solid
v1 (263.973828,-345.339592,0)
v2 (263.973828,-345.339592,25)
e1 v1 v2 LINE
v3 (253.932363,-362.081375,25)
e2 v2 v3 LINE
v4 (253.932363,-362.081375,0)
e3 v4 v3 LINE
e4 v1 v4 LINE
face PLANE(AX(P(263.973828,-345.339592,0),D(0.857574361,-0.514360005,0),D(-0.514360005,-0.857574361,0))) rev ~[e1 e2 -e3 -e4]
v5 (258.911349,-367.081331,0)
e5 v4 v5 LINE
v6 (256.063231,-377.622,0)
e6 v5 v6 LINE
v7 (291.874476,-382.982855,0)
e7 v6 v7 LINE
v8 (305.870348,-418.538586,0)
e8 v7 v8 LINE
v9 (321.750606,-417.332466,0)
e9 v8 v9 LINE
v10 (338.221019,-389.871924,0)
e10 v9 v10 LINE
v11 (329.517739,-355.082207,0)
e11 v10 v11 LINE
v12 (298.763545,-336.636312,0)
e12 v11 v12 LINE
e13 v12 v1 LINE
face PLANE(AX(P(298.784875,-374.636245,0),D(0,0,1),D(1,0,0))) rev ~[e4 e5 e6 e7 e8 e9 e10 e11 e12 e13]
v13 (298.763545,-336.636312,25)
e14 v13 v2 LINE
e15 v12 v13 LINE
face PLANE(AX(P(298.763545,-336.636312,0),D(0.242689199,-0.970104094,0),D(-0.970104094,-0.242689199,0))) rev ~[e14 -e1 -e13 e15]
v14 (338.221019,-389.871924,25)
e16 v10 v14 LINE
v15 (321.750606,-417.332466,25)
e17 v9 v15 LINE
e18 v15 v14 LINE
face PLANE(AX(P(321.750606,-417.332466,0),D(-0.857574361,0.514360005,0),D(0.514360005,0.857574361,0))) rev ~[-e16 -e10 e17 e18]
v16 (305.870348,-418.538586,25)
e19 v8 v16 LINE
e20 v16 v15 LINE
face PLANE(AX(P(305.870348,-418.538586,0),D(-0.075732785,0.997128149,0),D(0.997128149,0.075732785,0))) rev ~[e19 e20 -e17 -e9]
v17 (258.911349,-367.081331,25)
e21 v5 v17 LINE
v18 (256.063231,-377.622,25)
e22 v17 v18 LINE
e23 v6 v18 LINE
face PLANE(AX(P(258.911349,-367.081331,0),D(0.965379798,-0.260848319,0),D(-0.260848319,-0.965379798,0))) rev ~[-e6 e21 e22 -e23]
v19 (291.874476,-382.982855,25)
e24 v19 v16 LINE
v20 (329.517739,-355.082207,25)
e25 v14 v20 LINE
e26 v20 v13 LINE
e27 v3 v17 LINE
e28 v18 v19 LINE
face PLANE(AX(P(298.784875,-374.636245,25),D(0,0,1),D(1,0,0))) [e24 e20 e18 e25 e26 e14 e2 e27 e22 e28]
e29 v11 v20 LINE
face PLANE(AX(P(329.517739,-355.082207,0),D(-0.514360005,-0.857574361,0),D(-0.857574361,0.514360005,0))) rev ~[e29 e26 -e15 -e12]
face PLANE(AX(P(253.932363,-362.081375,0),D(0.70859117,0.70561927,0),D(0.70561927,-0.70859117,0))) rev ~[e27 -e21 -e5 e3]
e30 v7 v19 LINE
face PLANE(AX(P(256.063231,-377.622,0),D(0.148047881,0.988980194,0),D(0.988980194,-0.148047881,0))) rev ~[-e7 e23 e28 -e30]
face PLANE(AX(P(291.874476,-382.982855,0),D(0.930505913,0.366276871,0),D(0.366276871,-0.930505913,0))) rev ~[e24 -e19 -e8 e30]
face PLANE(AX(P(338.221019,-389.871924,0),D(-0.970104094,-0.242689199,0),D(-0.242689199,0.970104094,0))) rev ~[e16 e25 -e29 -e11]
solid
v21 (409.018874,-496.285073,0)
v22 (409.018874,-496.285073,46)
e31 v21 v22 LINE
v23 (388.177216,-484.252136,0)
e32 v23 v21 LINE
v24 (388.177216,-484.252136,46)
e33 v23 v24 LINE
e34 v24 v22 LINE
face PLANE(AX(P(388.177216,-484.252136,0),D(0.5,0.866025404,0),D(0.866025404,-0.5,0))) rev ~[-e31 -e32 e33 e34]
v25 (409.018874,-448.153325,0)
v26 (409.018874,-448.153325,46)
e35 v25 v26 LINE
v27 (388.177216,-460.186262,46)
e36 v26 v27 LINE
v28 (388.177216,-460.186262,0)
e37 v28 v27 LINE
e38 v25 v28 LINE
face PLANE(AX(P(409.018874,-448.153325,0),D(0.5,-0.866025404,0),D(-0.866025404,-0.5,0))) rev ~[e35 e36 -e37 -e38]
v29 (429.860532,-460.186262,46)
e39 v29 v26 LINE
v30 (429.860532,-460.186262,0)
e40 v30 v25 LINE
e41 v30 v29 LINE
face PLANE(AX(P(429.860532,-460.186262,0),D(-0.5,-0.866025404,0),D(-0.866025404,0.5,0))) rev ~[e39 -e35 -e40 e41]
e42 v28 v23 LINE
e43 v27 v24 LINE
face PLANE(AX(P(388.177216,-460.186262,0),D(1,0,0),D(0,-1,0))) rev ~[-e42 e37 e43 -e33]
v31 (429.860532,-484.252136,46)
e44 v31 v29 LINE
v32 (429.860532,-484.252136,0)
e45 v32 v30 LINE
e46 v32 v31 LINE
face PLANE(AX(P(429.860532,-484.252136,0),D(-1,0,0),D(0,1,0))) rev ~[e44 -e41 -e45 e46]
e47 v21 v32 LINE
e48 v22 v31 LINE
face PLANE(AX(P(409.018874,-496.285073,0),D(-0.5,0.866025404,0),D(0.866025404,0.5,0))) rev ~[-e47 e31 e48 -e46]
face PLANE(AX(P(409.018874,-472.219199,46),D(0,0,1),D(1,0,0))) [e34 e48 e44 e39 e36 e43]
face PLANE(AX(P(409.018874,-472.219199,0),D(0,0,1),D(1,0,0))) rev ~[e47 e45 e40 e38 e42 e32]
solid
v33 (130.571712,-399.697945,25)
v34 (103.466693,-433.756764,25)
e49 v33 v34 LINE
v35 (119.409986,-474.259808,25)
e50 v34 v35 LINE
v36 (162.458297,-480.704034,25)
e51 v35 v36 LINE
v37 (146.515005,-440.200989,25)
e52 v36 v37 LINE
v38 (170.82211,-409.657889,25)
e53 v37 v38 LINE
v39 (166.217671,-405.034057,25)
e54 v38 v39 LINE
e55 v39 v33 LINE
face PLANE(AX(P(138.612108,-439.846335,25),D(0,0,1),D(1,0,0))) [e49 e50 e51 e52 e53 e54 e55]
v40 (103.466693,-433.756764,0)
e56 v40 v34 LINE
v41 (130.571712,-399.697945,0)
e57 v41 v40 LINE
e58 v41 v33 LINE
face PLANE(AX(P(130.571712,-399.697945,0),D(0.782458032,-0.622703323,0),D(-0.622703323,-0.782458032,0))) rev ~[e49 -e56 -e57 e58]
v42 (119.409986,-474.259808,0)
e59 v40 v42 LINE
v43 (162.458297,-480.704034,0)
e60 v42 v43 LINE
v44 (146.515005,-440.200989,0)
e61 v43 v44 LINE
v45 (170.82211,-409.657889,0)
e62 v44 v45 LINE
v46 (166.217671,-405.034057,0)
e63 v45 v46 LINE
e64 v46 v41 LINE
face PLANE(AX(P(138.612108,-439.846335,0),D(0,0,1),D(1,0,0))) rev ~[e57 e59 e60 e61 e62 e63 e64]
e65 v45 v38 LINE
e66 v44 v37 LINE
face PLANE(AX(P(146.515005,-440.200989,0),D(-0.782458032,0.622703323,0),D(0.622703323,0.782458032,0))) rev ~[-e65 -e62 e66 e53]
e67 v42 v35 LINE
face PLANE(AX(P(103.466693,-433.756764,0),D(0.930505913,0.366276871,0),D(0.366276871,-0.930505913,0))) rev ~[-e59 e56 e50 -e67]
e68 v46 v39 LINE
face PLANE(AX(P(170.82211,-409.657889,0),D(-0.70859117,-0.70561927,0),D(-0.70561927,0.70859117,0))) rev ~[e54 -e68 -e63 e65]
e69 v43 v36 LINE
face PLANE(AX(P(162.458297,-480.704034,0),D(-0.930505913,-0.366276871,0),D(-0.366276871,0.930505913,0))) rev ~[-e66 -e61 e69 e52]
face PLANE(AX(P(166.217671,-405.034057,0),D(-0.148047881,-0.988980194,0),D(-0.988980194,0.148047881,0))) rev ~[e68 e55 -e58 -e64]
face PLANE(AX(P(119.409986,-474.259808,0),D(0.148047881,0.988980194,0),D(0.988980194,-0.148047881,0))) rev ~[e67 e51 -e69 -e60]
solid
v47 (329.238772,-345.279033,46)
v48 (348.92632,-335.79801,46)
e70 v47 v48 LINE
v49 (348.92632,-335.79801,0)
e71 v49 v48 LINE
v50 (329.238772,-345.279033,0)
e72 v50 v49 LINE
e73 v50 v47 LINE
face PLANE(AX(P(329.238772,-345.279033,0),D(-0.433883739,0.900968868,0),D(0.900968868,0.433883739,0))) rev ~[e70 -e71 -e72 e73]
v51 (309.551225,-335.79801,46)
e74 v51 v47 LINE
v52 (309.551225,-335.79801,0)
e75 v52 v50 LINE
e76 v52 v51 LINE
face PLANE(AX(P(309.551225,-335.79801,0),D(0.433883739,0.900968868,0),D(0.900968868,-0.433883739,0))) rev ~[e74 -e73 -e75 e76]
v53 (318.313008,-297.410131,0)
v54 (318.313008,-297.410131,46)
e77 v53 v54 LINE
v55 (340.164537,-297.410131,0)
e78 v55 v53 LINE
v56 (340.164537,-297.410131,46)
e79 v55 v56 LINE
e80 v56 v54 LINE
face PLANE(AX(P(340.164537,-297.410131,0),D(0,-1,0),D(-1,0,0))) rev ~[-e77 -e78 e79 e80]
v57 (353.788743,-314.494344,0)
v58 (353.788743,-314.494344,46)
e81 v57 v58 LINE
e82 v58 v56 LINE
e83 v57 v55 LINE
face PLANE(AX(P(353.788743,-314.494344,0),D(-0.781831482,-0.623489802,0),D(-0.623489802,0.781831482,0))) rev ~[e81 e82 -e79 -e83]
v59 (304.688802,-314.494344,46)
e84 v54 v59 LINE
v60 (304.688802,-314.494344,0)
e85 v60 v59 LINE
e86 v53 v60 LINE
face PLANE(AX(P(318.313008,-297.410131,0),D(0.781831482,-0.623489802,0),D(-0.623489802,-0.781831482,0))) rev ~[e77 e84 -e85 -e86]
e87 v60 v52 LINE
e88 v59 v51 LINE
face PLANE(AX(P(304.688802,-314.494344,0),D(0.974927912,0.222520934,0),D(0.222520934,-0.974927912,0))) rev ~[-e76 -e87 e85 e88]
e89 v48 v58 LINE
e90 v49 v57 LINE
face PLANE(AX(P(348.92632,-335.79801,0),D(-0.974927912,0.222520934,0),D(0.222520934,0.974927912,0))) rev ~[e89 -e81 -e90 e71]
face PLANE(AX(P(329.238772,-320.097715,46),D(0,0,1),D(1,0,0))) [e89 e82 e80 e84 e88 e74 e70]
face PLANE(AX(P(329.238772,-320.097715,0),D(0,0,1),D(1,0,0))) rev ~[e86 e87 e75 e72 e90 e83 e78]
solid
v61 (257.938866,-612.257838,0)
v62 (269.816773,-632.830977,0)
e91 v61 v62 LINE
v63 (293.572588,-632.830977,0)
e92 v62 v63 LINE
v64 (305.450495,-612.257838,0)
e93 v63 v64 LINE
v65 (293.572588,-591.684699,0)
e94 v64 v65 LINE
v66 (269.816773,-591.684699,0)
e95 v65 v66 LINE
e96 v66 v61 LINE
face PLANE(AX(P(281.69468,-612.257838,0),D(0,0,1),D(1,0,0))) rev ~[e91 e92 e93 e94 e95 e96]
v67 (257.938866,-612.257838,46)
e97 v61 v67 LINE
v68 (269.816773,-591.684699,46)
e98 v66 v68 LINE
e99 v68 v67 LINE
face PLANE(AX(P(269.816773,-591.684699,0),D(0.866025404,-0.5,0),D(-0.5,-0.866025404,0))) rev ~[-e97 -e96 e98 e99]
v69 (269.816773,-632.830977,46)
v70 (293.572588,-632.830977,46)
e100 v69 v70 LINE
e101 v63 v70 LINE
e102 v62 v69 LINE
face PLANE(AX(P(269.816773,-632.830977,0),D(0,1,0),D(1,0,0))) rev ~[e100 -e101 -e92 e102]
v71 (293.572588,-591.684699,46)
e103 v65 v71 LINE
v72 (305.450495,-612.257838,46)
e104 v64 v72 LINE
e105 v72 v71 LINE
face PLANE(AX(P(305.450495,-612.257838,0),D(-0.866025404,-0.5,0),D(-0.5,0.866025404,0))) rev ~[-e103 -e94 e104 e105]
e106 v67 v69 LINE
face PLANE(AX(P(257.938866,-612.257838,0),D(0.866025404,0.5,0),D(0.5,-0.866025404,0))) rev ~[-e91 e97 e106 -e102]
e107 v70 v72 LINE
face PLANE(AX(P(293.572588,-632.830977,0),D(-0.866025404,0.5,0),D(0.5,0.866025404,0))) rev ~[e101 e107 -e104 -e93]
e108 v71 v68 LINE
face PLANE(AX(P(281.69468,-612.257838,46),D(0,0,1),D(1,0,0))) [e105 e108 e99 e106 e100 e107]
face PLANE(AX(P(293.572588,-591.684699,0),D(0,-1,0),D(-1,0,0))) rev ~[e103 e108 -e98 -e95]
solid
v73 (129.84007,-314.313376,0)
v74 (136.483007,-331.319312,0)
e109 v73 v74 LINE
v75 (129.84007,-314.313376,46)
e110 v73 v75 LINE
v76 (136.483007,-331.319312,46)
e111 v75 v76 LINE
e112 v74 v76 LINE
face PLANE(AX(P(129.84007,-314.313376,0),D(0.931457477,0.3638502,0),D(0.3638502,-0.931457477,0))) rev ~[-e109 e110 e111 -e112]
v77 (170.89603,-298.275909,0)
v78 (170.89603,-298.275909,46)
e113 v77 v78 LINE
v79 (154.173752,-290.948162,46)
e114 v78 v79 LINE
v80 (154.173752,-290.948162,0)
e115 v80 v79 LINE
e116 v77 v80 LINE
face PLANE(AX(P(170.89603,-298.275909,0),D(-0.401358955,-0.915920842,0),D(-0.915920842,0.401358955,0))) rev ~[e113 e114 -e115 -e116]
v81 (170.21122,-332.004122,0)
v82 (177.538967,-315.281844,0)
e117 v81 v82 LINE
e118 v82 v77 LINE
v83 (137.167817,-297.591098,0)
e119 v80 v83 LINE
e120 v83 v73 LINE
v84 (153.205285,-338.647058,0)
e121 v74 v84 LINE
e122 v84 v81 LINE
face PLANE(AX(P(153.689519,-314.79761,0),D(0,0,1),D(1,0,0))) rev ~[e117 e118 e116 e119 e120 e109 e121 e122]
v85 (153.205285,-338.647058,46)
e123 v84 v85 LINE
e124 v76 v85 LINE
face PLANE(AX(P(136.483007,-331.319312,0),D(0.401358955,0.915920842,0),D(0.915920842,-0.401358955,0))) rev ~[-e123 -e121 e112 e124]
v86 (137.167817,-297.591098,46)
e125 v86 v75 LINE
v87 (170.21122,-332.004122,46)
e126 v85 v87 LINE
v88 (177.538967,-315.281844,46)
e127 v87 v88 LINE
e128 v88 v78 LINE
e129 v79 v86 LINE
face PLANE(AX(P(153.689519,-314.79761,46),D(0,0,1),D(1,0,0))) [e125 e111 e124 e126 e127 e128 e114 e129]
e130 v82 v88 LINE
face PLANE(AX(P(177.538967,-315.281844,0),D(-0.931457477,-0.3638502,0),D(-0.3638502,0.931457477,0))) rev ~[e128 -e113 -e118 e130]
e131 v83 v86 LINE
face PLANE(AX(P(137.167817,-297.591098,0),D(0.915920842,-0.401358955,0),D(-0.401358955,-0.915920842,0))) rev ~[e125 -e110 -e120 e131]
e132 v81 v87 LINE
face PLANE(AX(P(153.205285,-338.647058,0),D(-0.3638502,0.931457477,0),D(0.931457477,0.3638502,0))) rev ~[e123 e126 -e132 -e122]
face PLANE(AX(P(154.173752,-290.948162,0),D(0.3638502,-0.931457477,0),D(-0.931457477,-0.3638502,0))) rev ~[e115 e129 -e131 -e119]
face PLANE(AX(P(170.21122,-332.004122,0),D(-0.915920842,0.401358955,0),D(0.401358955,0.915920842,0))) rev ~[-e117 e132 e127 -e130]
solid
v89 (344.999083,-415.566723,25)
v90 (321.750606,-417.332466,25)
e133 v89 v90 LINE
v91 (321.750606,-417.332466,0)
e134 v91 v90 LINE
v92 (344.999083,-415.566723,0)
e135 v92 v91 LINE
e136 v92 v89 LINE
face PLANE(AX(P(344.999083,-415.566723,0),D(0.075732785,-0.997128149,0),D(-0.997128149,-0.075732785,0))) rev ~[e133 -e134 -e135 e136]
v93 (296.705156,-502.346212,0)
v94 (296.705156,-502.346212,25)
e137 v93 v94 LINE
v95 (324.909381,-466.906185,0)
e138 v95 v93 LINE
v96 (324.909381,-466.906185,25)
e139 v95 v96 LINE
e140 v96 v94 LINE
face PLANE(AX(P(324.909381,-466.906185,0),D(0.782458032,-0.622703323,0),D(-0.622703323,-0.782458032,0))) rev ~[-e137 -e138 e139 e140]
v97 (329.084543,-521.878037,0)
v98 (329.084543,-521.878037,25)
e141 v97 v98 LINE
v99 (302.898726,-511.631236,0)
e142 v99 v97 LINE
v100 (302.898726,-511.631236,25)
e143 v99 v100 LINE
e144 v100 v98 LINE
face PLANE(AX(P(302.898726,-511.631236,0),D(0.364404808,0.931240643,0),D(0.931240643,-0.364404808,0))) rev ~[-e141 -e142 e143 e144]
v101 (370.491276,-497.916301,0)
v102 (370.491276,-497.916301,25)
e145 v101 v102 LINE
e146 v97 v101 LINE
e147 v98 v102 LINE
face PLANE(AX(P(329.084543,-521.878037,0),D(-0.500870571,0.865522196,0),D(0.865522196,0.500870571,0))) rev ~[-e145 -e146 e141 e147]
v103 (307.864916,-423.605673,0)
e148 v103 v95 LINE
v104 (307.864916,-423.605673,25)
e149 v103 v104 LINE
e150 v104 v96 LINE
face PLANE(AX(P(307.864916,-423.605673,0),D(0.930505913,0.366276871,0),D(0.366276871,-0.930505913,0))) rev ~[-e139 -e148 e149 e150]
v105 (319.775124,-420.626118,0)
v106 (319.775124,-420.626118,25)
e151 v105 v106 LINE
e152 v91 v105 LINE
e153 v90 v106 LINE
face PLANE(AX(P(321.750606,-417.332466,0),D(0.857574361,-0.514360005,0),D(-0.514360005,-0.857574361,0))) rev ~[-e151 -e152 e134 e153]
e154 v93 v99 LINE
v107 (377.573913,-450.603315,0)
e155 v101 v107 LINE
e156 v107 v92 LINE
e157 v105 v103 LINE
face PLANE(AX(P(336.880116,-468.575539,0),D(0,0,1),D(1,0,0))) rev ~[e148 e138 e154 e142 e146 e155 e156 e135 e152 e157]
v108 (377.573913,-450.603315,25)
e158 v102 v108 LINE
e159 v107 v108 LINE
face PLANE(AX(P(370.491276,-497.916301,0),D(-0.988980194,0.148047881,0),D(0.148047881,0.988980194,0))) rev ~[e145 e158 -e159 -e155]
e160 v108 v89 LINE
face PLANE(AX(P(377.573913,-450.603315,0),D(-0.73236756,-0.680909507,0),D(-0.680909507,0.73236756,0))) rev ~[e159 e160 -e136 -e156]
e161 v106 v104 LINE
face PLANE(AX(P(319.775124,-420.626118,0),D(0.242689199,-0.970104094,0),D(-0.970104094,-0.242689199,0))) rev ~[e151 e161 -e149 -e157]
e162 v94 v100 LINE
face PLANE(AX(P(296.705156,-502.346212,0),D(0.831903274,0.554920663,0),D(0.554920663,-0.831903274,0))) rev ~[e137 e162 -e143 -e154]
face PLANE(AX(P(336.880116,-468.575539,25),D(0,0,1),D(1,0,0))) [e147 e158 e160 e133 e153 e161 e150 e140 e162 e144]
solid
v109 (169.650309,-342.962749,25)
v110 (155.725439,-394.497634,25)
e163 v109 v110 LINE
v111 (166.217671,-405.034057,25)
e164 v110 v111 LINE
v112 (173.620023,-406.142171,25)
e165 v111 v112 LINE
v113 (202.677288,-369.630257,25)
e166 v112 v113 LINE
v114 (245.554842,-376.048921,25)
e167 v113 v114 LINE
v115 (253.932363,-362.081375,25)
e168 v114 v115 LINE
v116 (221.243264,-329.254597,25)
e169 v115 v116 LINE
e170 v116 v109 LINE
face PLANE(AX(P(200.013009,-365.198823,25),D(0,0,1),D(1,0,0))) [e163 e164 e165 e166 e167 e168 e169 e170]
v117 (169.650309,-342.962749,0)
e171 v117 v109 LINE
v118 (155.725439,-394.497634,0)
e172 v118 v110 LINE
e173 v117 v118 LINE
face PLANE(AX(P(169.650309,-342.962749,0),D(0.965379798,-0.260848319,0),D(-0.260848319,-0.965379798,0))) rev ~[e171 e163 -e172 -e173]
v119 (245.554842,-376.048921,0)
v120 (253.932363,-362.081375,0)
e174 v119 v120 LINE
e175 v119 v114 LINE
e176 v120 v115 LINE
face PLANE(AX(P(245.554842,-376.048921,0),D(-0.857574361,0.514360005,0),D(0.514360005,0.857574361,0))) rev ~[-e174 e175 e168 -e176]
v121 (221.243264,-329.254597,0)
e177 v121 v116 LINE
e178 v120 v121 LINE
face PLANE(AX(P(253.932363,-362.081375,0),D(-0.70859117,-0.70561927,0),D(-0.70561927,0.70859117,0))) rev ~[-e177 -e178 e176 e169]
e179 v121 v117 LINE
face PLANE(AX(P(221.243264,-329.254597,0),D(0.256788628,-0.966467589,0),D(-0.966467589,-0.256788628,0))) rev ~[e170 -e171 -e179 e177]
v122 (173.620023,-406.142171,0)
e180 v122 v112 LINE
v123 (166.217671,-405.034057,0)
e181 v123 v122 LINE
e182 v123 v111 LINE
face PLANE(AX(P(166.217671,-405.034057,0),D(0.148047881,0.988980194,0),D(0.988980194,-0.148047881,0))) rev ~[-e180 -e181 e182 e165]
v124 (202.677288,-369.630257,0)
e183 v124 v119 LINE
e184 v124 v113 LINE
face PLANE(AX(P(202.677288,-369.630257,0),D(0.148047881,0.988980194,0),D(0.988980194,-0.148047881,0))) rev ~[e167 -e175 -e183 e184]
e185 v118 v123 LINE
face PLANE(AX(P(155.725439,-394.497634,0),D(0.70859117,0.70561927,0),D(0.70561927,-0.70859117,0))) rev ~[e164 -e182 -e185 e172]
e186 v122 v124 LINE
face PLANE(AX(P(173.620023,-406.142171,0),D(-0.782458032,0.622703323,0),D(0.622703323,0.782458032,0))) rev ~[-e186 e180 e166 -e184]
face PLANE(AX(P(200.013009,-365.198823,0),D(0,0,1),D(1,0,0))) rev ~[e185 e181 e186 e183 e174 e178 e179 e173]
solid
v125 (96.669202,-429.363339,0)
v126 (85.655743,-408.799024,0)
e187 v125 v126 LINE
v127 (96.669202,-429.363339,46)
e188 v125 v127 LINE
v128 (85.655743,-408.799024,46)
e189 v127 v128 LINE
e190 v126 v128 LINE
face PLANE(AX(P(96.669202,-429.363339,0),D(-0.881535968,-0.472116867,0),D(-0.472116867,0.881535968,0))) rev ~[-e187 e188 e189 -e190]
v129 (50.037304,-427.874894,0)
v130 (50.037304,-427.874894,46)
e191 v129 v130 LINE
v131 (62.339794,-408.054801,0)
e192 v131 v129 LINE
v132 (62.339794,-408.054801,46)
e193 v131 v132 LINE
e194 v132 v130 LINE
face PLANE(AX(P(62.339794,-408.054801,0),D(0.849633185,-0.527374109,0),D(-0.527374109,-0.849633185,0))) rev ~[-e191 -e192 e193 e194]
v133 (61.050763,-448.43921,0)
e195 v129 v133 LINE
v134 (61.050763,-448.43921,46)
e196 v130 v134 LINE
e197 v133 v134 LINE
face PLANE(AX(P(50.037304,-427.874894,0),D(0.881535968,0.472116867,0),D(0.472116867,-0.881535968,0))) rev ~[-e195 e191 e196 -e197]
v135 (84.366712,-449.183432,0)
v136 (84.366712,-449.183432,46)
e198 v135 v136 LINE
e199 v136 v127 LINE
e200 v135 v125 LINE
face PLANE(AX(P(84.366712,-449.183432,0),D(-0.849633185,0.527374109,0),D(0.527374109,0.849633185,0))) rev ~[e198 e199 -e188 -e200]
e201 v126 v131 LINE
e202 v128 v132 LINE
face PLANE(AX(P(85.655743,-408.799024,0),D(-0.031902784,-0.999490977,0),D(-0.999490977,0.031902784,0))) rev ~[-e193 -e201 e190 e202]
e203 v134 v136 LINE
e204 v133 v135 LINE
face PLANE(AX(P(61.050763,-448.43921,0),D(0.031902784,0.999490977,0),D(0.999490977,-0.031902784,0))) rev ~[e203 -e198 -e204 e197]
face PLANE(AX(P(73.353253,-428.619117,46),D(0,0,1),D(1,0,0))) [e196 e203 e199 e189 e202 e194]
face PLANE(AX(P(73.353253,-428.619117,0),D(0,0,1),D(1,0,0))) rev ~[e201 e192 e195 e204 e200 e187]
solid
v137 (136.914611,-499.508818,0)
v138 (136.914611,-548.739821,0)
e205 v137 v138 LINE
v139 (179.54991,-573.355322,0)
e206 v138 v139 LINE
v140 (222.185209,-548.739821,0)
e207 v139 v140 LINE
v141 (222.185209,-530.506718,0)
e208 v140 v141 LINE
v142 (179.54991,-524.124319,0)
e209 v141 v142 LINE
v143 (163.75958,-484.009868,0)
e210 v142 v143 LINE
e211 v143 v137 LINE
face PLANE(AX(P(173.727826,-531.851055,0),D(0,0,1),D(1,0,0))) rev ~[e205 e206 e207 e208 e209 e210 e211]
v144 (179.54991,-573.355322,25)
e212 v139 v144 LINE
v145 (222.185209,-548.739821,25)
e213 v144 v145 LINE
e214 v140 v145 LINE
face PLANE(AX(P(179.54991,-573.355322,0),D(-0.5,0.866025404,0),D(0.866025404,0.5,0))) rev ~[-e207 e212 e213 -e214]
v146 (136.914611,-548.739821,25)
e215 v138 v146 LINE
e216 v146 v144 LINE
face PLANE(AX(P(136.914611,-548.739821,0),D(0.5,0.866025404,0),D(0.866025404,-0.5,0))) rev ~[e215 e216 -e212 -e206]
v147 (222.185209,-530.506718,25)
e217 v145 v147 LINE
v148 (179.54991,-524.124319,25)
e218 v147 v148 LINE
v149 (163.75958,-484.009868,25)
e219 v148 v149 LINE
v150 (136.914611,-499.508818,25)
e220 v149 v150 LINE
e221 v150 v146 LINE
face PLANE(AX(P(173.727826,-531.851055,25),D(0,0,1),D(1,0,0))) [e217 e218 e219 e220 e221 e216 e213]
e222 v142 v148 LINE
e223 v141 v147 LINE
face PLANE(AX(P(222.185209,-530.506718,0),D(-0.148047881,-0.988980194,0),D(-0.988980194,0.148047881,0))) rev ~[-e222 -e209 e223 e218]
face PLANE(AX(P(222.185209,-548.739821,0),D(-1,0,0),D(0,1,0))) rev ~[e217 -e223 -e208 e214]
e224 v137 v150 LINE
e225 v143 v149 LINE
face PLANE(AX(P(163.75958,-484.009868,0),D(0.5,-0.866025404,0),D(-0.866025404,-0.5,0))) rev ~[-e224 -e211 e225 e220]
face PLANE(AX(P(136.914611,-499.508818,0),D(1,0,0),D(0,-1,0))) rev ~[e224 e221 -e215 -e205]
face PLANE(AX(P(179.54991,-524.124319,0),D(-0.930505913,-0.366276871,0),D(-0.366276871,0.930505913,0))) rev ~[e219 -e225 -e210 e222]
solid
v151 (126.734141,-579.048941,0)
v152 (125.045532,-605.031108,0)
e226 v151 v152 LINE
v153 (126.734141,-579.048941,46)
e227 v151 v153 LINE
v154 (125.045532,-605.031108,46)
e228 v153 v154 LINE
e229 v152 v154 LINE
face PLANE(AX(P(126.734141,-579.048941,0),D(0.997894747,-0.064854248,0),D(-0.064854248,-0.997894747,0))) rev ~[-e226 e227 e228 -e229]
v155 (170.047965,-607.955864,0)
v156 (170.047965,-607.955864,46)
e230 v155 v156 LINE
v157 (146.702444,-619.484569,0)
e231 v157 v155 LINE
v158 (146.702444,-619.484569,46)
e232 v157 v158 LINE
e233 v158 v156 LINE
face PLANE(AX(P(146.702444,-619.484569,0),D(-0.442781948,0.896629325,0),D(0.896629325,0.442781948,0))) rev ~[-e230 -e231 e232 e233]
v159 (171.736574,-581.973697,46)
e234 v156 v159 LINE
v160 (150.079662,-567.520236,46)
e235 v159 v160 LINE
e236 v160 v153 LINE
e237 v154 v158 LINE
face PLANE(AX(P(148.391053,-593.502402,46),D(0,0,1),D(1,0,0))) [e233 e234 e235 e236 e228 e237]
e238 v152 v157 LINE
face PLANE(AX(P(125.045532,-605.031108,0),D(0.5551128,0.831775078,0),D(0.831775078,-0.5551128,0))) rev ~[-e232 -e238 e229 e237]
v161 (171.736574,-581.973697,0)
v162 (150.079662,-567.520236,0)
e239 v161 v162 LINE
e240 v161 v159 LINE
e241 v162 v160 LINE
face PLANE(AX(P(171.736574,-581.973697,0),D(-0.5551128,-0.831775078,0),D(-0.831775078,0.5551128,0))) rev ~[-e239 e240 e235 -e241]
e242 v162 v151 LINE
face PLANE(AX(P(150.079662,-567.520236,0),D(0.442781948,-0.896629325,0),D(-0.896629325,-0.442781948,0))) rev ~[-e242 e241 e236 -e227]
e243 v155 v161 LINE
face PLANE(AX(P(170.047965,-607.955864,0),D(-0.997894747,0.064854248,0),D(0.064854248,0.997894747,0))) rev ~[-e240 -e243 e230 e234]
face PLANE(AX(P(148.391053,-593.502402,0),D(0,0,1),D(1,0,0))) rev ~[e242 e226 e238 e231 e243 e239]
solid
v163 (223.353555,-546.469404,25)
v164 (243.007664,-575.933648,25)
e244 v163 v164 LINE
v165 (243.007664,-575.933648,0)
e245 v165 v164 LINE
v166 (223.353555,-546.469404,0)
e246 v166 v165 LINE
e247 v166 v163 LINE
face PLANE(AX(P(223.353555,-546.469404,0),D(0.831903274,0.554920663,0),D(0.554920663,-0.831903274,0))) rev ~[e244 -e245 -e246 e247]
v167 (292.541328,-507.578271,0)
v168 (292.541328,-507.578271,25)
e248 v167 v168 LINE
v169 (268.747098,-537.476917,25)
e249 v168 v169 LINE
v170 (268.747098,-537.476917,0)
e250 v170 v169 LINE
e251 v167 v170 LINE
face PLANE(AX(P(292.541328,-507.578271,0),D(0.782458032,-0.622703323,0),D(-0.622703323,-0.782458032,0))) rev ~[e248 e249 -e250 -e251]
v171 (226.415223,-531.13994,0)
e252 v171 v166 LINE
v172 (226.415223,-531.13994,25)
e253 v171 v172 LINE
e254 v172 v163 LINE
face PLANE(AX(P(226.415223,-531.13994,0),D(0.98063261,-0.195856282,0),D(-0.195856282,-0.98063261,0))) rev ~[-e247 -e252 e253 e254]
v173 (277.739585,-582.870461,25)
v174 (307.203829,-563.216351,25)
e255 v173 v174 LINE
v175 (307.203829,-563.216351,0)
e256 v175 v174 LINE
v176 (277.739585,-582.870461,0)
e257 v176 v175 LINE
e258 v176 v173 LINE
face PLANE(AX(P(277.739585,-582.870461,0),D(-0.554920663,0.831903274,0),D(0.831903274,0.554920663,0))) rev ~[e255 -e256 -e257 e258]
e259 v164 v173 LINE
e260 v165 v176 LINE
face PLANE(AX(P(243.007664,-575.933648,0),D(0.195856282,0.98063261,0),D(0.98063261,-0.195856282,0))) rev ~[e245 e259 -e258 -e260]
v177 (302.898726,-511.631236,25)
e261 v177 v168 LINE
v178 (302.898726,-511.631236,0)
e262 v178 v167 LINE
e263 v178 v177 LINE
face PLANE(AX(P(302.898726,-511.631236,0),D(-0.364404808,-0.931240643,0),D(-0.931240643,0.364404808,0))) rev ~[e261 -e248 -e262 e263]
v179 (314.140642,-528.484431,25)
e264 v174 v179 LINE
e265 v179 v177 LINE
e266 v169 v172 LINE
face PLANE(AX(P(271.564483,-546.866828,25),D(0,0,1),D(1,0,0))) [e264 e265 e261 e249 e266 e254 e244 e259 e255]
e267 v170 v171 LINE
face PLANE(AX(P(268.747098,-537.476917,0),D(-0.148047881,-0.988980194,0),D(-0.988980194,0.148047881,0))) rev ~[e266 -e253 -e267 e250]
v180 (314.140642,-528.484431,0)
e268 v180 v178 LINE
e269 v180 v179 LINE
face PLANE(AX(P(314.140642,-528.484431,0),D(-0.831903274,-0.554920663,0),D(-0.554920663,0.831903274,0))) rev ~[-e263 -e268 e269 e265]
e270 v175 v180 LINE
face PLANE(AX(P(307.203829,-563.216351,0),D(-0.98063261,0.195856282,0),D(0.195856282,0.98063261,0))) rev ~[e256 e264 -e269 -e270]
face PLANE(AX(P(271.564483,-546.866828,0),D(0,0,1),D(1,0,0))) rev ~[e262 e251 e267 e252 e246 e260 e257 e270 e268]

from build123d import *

# Parameters (mm, degrees)
F1_DEPTH = 25
F5_DEPTH = 46


# Not quite as in the source:
# - the program builds the solid bodies; features that only make, move or delete a surface that nothing else refers to are left out


with BuildPart() as f1:
    # F0 (on Top) → F1 (new body)
    with BuildSketch(Plane.XY):
        Polygon((222.1852089025, -548.7398207486), (222.1852089025, -530.5067178582), (179.5499098826, -524.1243193825), (163.7595795897, -484.0098680956), (136.9146108627, -499.5088180164), (136.9146108627, -548.7398207486), (179.5499098826, -573.3553221147), align=None)
    extrude(amount=F1_DEPTH)


with BuildPart() as f1b:
    # F0 (on Top) → F1, piece 2 (new body)
    with BuildSketch(Plane.XY):
        Polygon((119.4099858602, -474.2598081213), (162.4582974419, -480.7040335526), (146.5150045824, -440.2009894172), (170.8221101954, -409.6578891972), (166.217670693, -405.0340568941), (130.5717117228, -399.6979452818), (103.4666930007, -433.7567639858), align=None)
    extrude(amount=F1_DEPTH)


with BuildPart() as f1c:
    # F0 (on Top) → F1, piece 3 (new body)
    with BuildSketch(Plane.XY):
        Polygon((166.217670693, -405.0340568941), (173.6200233045, -406.1421707132), (202.6772876524, -369.6302572329), (245.5548420979, -376.0489207447), (253.9323629055, -362.0813747017), (221.2432641031, -329.2545972135), (169.6503089808, -342.9627487539), (155.7254388925, -394.4976343163), align=None)
    extrude(amount=F1_DEPTH)


with BuildPart() as f1d:
    # F0 (on Top) → F1, piece 4 (new body)
    with BuildSketch(Plane.XY):
        Polygon((258.9113491372, -367.0813312356), (256.0632308556, -377.6220004681), (291.8744760227, -382.982855014), (305.8703483184, -418.5385860855), (321.7506056308, -417.3324661794), (338.2210194956, -389.8719239393), (329.5177385501, -355.0822071929), (298.763544948, -336.6363115411), (263.9738282016, -345.3395924866), (253.9323629055, -362.0813747017), align=None)
    extrude(amount=F1_DEPTH)


with BuildPart() as f1e:
    # F0 (on Top) → F1, piece 5 (new body)
    with BuildSketch(Plane.XY):
        Polygon((324.9093813229, -466.9061849793), (296.7051560656, -502.3462119564), (302.8987264088, -511.6312355413), (329.0845431676, -521.8780365199), (370.4912763382, -497.9163008296), (377.5739128611, -450.6033154129), (344.999082975, -415.5667232977), (321.7506056308, -417.3324661794), (319.7751238438, -420.6261175414), (307.8649156693, -423.605672926), align=None)
    extrude(amount=F1_DEPTH)


with BuildPart() as f1f:
    # F0 (on Top) → F1, piece 6 (new body)
    with BuildSketch(Plane.XY):
        Polygon((268.7470982529, -537.4769171636), (226.4152229627, -531.1399404674), (223.3535547567, -546.4694037319), (243.0076640568, -575.933647824), (277.7395848212, -582.8704606597), (307.2038289133, -563.2163513596), (314.140641749, -528.4844305953), (302.8987264088, -511.6312355413), (292.541328463, -507.5782706716), align=None)
    extrude(amount=F1_DEPTH)


with BuildPart() as f5:
    # F4 (on Top) → F5 (new body)
    with BuildSketch(Plane.XY):
        Polygon((50.0373041585, -427.8748940379), (61.0507631347, -448.4392095655), (84.3667122812, -449.1834320724), (96.6692024515, -429.3633390516), (85.6557434752, -408.7990235239), (62.3397943287, -408.0548010171), align=None)
    extrude(amount=F5_DEPTH)


with BuildPart() as f5b:
    # F4 (on Top) → F5, piece 2 (new body)
    with BuildSketch(Plane.XY):
        Polygon((137.167817033, -297.5910984255), (129.8400703304, -314.3133761923), (136.4830069519, -331.3193115823), (153.2052847187, -338.647058285), (170.2112201088, -332.0041216635), (177.5389668114, -315.2818438967), (170.8960301899, -298.2759085066), (154.1737524231, -290.948161804), align=None)
    extrude(amount=F5_DEPTH)


with BuildPart() as f5c:
    # F4 (on Top) → F5, piece 3 (new body)
    with BuildSketch(Plane.XY):
        Polygon((429.8605322838, -484.2521358655), (429.8605322838, -460.1862620189), (409.0188741684, -448.1533250956), (388.177216053, -460.1862620189), (388.177216053, -484.2521358655), (409.0188741684, -496.2850727887), align=None)
    extrude(amount=F5_DEPTH)


with BuildPart() as f5d:
    # F4 (on Top) → F5, piece 4 (new body)
    with BuildSketch(Plane.XY):
        Polygon((269.8167730025, -632.8309774399), (293.5725879022, -632.8309774399), (305.450495352, -612.2578382492), (293.5725879022, -591.6846990585), (269.8167730025, -591.6846990585), (257.9388655527, -612.2578382492), align=None)
    extrude(amount=F5_DEPTH)


with BuildPart() as f5e:
    # F4 (on Top) → F5, piece 5 (new body)
    with BuildSketch(Plane.XY):
        Polygon((125.04553228, -605.0311075118), (146.7024442616, -619.4845689866), (170.0479650622, -607.9558637804), (171.7365738812, -581.9736970994), (150.0796618995, -567.5202356246), (126.7341410989, -579.0489408308), align=None)
    extrude(amount=F5_DEPTH)


with BuildPart() as f5f:
    # F4 (on Top) → F5, piece 6 (new body)
    with BuildSketch(Plane.XY):
        Polygon((340.1645370866, -297.4101305008), (318.3130076979, -297.4101305008), (304.688801969, -314.494344117), (309.551224697, -335.7980100419), (329.2387723923, -345.2790333185), (348.9263200876, -335.7980100419), (353.7887428155, -314.494344117), align=None)
    extrude(amount=F5_DEPTH)


solid = Compound([f1.part, f1b.part, f1c.part, f1d.part, f1e.part, f1f.part, f5.part, f5b.part, f5c.part, f5d.part, f5e.part, f5f.part])
